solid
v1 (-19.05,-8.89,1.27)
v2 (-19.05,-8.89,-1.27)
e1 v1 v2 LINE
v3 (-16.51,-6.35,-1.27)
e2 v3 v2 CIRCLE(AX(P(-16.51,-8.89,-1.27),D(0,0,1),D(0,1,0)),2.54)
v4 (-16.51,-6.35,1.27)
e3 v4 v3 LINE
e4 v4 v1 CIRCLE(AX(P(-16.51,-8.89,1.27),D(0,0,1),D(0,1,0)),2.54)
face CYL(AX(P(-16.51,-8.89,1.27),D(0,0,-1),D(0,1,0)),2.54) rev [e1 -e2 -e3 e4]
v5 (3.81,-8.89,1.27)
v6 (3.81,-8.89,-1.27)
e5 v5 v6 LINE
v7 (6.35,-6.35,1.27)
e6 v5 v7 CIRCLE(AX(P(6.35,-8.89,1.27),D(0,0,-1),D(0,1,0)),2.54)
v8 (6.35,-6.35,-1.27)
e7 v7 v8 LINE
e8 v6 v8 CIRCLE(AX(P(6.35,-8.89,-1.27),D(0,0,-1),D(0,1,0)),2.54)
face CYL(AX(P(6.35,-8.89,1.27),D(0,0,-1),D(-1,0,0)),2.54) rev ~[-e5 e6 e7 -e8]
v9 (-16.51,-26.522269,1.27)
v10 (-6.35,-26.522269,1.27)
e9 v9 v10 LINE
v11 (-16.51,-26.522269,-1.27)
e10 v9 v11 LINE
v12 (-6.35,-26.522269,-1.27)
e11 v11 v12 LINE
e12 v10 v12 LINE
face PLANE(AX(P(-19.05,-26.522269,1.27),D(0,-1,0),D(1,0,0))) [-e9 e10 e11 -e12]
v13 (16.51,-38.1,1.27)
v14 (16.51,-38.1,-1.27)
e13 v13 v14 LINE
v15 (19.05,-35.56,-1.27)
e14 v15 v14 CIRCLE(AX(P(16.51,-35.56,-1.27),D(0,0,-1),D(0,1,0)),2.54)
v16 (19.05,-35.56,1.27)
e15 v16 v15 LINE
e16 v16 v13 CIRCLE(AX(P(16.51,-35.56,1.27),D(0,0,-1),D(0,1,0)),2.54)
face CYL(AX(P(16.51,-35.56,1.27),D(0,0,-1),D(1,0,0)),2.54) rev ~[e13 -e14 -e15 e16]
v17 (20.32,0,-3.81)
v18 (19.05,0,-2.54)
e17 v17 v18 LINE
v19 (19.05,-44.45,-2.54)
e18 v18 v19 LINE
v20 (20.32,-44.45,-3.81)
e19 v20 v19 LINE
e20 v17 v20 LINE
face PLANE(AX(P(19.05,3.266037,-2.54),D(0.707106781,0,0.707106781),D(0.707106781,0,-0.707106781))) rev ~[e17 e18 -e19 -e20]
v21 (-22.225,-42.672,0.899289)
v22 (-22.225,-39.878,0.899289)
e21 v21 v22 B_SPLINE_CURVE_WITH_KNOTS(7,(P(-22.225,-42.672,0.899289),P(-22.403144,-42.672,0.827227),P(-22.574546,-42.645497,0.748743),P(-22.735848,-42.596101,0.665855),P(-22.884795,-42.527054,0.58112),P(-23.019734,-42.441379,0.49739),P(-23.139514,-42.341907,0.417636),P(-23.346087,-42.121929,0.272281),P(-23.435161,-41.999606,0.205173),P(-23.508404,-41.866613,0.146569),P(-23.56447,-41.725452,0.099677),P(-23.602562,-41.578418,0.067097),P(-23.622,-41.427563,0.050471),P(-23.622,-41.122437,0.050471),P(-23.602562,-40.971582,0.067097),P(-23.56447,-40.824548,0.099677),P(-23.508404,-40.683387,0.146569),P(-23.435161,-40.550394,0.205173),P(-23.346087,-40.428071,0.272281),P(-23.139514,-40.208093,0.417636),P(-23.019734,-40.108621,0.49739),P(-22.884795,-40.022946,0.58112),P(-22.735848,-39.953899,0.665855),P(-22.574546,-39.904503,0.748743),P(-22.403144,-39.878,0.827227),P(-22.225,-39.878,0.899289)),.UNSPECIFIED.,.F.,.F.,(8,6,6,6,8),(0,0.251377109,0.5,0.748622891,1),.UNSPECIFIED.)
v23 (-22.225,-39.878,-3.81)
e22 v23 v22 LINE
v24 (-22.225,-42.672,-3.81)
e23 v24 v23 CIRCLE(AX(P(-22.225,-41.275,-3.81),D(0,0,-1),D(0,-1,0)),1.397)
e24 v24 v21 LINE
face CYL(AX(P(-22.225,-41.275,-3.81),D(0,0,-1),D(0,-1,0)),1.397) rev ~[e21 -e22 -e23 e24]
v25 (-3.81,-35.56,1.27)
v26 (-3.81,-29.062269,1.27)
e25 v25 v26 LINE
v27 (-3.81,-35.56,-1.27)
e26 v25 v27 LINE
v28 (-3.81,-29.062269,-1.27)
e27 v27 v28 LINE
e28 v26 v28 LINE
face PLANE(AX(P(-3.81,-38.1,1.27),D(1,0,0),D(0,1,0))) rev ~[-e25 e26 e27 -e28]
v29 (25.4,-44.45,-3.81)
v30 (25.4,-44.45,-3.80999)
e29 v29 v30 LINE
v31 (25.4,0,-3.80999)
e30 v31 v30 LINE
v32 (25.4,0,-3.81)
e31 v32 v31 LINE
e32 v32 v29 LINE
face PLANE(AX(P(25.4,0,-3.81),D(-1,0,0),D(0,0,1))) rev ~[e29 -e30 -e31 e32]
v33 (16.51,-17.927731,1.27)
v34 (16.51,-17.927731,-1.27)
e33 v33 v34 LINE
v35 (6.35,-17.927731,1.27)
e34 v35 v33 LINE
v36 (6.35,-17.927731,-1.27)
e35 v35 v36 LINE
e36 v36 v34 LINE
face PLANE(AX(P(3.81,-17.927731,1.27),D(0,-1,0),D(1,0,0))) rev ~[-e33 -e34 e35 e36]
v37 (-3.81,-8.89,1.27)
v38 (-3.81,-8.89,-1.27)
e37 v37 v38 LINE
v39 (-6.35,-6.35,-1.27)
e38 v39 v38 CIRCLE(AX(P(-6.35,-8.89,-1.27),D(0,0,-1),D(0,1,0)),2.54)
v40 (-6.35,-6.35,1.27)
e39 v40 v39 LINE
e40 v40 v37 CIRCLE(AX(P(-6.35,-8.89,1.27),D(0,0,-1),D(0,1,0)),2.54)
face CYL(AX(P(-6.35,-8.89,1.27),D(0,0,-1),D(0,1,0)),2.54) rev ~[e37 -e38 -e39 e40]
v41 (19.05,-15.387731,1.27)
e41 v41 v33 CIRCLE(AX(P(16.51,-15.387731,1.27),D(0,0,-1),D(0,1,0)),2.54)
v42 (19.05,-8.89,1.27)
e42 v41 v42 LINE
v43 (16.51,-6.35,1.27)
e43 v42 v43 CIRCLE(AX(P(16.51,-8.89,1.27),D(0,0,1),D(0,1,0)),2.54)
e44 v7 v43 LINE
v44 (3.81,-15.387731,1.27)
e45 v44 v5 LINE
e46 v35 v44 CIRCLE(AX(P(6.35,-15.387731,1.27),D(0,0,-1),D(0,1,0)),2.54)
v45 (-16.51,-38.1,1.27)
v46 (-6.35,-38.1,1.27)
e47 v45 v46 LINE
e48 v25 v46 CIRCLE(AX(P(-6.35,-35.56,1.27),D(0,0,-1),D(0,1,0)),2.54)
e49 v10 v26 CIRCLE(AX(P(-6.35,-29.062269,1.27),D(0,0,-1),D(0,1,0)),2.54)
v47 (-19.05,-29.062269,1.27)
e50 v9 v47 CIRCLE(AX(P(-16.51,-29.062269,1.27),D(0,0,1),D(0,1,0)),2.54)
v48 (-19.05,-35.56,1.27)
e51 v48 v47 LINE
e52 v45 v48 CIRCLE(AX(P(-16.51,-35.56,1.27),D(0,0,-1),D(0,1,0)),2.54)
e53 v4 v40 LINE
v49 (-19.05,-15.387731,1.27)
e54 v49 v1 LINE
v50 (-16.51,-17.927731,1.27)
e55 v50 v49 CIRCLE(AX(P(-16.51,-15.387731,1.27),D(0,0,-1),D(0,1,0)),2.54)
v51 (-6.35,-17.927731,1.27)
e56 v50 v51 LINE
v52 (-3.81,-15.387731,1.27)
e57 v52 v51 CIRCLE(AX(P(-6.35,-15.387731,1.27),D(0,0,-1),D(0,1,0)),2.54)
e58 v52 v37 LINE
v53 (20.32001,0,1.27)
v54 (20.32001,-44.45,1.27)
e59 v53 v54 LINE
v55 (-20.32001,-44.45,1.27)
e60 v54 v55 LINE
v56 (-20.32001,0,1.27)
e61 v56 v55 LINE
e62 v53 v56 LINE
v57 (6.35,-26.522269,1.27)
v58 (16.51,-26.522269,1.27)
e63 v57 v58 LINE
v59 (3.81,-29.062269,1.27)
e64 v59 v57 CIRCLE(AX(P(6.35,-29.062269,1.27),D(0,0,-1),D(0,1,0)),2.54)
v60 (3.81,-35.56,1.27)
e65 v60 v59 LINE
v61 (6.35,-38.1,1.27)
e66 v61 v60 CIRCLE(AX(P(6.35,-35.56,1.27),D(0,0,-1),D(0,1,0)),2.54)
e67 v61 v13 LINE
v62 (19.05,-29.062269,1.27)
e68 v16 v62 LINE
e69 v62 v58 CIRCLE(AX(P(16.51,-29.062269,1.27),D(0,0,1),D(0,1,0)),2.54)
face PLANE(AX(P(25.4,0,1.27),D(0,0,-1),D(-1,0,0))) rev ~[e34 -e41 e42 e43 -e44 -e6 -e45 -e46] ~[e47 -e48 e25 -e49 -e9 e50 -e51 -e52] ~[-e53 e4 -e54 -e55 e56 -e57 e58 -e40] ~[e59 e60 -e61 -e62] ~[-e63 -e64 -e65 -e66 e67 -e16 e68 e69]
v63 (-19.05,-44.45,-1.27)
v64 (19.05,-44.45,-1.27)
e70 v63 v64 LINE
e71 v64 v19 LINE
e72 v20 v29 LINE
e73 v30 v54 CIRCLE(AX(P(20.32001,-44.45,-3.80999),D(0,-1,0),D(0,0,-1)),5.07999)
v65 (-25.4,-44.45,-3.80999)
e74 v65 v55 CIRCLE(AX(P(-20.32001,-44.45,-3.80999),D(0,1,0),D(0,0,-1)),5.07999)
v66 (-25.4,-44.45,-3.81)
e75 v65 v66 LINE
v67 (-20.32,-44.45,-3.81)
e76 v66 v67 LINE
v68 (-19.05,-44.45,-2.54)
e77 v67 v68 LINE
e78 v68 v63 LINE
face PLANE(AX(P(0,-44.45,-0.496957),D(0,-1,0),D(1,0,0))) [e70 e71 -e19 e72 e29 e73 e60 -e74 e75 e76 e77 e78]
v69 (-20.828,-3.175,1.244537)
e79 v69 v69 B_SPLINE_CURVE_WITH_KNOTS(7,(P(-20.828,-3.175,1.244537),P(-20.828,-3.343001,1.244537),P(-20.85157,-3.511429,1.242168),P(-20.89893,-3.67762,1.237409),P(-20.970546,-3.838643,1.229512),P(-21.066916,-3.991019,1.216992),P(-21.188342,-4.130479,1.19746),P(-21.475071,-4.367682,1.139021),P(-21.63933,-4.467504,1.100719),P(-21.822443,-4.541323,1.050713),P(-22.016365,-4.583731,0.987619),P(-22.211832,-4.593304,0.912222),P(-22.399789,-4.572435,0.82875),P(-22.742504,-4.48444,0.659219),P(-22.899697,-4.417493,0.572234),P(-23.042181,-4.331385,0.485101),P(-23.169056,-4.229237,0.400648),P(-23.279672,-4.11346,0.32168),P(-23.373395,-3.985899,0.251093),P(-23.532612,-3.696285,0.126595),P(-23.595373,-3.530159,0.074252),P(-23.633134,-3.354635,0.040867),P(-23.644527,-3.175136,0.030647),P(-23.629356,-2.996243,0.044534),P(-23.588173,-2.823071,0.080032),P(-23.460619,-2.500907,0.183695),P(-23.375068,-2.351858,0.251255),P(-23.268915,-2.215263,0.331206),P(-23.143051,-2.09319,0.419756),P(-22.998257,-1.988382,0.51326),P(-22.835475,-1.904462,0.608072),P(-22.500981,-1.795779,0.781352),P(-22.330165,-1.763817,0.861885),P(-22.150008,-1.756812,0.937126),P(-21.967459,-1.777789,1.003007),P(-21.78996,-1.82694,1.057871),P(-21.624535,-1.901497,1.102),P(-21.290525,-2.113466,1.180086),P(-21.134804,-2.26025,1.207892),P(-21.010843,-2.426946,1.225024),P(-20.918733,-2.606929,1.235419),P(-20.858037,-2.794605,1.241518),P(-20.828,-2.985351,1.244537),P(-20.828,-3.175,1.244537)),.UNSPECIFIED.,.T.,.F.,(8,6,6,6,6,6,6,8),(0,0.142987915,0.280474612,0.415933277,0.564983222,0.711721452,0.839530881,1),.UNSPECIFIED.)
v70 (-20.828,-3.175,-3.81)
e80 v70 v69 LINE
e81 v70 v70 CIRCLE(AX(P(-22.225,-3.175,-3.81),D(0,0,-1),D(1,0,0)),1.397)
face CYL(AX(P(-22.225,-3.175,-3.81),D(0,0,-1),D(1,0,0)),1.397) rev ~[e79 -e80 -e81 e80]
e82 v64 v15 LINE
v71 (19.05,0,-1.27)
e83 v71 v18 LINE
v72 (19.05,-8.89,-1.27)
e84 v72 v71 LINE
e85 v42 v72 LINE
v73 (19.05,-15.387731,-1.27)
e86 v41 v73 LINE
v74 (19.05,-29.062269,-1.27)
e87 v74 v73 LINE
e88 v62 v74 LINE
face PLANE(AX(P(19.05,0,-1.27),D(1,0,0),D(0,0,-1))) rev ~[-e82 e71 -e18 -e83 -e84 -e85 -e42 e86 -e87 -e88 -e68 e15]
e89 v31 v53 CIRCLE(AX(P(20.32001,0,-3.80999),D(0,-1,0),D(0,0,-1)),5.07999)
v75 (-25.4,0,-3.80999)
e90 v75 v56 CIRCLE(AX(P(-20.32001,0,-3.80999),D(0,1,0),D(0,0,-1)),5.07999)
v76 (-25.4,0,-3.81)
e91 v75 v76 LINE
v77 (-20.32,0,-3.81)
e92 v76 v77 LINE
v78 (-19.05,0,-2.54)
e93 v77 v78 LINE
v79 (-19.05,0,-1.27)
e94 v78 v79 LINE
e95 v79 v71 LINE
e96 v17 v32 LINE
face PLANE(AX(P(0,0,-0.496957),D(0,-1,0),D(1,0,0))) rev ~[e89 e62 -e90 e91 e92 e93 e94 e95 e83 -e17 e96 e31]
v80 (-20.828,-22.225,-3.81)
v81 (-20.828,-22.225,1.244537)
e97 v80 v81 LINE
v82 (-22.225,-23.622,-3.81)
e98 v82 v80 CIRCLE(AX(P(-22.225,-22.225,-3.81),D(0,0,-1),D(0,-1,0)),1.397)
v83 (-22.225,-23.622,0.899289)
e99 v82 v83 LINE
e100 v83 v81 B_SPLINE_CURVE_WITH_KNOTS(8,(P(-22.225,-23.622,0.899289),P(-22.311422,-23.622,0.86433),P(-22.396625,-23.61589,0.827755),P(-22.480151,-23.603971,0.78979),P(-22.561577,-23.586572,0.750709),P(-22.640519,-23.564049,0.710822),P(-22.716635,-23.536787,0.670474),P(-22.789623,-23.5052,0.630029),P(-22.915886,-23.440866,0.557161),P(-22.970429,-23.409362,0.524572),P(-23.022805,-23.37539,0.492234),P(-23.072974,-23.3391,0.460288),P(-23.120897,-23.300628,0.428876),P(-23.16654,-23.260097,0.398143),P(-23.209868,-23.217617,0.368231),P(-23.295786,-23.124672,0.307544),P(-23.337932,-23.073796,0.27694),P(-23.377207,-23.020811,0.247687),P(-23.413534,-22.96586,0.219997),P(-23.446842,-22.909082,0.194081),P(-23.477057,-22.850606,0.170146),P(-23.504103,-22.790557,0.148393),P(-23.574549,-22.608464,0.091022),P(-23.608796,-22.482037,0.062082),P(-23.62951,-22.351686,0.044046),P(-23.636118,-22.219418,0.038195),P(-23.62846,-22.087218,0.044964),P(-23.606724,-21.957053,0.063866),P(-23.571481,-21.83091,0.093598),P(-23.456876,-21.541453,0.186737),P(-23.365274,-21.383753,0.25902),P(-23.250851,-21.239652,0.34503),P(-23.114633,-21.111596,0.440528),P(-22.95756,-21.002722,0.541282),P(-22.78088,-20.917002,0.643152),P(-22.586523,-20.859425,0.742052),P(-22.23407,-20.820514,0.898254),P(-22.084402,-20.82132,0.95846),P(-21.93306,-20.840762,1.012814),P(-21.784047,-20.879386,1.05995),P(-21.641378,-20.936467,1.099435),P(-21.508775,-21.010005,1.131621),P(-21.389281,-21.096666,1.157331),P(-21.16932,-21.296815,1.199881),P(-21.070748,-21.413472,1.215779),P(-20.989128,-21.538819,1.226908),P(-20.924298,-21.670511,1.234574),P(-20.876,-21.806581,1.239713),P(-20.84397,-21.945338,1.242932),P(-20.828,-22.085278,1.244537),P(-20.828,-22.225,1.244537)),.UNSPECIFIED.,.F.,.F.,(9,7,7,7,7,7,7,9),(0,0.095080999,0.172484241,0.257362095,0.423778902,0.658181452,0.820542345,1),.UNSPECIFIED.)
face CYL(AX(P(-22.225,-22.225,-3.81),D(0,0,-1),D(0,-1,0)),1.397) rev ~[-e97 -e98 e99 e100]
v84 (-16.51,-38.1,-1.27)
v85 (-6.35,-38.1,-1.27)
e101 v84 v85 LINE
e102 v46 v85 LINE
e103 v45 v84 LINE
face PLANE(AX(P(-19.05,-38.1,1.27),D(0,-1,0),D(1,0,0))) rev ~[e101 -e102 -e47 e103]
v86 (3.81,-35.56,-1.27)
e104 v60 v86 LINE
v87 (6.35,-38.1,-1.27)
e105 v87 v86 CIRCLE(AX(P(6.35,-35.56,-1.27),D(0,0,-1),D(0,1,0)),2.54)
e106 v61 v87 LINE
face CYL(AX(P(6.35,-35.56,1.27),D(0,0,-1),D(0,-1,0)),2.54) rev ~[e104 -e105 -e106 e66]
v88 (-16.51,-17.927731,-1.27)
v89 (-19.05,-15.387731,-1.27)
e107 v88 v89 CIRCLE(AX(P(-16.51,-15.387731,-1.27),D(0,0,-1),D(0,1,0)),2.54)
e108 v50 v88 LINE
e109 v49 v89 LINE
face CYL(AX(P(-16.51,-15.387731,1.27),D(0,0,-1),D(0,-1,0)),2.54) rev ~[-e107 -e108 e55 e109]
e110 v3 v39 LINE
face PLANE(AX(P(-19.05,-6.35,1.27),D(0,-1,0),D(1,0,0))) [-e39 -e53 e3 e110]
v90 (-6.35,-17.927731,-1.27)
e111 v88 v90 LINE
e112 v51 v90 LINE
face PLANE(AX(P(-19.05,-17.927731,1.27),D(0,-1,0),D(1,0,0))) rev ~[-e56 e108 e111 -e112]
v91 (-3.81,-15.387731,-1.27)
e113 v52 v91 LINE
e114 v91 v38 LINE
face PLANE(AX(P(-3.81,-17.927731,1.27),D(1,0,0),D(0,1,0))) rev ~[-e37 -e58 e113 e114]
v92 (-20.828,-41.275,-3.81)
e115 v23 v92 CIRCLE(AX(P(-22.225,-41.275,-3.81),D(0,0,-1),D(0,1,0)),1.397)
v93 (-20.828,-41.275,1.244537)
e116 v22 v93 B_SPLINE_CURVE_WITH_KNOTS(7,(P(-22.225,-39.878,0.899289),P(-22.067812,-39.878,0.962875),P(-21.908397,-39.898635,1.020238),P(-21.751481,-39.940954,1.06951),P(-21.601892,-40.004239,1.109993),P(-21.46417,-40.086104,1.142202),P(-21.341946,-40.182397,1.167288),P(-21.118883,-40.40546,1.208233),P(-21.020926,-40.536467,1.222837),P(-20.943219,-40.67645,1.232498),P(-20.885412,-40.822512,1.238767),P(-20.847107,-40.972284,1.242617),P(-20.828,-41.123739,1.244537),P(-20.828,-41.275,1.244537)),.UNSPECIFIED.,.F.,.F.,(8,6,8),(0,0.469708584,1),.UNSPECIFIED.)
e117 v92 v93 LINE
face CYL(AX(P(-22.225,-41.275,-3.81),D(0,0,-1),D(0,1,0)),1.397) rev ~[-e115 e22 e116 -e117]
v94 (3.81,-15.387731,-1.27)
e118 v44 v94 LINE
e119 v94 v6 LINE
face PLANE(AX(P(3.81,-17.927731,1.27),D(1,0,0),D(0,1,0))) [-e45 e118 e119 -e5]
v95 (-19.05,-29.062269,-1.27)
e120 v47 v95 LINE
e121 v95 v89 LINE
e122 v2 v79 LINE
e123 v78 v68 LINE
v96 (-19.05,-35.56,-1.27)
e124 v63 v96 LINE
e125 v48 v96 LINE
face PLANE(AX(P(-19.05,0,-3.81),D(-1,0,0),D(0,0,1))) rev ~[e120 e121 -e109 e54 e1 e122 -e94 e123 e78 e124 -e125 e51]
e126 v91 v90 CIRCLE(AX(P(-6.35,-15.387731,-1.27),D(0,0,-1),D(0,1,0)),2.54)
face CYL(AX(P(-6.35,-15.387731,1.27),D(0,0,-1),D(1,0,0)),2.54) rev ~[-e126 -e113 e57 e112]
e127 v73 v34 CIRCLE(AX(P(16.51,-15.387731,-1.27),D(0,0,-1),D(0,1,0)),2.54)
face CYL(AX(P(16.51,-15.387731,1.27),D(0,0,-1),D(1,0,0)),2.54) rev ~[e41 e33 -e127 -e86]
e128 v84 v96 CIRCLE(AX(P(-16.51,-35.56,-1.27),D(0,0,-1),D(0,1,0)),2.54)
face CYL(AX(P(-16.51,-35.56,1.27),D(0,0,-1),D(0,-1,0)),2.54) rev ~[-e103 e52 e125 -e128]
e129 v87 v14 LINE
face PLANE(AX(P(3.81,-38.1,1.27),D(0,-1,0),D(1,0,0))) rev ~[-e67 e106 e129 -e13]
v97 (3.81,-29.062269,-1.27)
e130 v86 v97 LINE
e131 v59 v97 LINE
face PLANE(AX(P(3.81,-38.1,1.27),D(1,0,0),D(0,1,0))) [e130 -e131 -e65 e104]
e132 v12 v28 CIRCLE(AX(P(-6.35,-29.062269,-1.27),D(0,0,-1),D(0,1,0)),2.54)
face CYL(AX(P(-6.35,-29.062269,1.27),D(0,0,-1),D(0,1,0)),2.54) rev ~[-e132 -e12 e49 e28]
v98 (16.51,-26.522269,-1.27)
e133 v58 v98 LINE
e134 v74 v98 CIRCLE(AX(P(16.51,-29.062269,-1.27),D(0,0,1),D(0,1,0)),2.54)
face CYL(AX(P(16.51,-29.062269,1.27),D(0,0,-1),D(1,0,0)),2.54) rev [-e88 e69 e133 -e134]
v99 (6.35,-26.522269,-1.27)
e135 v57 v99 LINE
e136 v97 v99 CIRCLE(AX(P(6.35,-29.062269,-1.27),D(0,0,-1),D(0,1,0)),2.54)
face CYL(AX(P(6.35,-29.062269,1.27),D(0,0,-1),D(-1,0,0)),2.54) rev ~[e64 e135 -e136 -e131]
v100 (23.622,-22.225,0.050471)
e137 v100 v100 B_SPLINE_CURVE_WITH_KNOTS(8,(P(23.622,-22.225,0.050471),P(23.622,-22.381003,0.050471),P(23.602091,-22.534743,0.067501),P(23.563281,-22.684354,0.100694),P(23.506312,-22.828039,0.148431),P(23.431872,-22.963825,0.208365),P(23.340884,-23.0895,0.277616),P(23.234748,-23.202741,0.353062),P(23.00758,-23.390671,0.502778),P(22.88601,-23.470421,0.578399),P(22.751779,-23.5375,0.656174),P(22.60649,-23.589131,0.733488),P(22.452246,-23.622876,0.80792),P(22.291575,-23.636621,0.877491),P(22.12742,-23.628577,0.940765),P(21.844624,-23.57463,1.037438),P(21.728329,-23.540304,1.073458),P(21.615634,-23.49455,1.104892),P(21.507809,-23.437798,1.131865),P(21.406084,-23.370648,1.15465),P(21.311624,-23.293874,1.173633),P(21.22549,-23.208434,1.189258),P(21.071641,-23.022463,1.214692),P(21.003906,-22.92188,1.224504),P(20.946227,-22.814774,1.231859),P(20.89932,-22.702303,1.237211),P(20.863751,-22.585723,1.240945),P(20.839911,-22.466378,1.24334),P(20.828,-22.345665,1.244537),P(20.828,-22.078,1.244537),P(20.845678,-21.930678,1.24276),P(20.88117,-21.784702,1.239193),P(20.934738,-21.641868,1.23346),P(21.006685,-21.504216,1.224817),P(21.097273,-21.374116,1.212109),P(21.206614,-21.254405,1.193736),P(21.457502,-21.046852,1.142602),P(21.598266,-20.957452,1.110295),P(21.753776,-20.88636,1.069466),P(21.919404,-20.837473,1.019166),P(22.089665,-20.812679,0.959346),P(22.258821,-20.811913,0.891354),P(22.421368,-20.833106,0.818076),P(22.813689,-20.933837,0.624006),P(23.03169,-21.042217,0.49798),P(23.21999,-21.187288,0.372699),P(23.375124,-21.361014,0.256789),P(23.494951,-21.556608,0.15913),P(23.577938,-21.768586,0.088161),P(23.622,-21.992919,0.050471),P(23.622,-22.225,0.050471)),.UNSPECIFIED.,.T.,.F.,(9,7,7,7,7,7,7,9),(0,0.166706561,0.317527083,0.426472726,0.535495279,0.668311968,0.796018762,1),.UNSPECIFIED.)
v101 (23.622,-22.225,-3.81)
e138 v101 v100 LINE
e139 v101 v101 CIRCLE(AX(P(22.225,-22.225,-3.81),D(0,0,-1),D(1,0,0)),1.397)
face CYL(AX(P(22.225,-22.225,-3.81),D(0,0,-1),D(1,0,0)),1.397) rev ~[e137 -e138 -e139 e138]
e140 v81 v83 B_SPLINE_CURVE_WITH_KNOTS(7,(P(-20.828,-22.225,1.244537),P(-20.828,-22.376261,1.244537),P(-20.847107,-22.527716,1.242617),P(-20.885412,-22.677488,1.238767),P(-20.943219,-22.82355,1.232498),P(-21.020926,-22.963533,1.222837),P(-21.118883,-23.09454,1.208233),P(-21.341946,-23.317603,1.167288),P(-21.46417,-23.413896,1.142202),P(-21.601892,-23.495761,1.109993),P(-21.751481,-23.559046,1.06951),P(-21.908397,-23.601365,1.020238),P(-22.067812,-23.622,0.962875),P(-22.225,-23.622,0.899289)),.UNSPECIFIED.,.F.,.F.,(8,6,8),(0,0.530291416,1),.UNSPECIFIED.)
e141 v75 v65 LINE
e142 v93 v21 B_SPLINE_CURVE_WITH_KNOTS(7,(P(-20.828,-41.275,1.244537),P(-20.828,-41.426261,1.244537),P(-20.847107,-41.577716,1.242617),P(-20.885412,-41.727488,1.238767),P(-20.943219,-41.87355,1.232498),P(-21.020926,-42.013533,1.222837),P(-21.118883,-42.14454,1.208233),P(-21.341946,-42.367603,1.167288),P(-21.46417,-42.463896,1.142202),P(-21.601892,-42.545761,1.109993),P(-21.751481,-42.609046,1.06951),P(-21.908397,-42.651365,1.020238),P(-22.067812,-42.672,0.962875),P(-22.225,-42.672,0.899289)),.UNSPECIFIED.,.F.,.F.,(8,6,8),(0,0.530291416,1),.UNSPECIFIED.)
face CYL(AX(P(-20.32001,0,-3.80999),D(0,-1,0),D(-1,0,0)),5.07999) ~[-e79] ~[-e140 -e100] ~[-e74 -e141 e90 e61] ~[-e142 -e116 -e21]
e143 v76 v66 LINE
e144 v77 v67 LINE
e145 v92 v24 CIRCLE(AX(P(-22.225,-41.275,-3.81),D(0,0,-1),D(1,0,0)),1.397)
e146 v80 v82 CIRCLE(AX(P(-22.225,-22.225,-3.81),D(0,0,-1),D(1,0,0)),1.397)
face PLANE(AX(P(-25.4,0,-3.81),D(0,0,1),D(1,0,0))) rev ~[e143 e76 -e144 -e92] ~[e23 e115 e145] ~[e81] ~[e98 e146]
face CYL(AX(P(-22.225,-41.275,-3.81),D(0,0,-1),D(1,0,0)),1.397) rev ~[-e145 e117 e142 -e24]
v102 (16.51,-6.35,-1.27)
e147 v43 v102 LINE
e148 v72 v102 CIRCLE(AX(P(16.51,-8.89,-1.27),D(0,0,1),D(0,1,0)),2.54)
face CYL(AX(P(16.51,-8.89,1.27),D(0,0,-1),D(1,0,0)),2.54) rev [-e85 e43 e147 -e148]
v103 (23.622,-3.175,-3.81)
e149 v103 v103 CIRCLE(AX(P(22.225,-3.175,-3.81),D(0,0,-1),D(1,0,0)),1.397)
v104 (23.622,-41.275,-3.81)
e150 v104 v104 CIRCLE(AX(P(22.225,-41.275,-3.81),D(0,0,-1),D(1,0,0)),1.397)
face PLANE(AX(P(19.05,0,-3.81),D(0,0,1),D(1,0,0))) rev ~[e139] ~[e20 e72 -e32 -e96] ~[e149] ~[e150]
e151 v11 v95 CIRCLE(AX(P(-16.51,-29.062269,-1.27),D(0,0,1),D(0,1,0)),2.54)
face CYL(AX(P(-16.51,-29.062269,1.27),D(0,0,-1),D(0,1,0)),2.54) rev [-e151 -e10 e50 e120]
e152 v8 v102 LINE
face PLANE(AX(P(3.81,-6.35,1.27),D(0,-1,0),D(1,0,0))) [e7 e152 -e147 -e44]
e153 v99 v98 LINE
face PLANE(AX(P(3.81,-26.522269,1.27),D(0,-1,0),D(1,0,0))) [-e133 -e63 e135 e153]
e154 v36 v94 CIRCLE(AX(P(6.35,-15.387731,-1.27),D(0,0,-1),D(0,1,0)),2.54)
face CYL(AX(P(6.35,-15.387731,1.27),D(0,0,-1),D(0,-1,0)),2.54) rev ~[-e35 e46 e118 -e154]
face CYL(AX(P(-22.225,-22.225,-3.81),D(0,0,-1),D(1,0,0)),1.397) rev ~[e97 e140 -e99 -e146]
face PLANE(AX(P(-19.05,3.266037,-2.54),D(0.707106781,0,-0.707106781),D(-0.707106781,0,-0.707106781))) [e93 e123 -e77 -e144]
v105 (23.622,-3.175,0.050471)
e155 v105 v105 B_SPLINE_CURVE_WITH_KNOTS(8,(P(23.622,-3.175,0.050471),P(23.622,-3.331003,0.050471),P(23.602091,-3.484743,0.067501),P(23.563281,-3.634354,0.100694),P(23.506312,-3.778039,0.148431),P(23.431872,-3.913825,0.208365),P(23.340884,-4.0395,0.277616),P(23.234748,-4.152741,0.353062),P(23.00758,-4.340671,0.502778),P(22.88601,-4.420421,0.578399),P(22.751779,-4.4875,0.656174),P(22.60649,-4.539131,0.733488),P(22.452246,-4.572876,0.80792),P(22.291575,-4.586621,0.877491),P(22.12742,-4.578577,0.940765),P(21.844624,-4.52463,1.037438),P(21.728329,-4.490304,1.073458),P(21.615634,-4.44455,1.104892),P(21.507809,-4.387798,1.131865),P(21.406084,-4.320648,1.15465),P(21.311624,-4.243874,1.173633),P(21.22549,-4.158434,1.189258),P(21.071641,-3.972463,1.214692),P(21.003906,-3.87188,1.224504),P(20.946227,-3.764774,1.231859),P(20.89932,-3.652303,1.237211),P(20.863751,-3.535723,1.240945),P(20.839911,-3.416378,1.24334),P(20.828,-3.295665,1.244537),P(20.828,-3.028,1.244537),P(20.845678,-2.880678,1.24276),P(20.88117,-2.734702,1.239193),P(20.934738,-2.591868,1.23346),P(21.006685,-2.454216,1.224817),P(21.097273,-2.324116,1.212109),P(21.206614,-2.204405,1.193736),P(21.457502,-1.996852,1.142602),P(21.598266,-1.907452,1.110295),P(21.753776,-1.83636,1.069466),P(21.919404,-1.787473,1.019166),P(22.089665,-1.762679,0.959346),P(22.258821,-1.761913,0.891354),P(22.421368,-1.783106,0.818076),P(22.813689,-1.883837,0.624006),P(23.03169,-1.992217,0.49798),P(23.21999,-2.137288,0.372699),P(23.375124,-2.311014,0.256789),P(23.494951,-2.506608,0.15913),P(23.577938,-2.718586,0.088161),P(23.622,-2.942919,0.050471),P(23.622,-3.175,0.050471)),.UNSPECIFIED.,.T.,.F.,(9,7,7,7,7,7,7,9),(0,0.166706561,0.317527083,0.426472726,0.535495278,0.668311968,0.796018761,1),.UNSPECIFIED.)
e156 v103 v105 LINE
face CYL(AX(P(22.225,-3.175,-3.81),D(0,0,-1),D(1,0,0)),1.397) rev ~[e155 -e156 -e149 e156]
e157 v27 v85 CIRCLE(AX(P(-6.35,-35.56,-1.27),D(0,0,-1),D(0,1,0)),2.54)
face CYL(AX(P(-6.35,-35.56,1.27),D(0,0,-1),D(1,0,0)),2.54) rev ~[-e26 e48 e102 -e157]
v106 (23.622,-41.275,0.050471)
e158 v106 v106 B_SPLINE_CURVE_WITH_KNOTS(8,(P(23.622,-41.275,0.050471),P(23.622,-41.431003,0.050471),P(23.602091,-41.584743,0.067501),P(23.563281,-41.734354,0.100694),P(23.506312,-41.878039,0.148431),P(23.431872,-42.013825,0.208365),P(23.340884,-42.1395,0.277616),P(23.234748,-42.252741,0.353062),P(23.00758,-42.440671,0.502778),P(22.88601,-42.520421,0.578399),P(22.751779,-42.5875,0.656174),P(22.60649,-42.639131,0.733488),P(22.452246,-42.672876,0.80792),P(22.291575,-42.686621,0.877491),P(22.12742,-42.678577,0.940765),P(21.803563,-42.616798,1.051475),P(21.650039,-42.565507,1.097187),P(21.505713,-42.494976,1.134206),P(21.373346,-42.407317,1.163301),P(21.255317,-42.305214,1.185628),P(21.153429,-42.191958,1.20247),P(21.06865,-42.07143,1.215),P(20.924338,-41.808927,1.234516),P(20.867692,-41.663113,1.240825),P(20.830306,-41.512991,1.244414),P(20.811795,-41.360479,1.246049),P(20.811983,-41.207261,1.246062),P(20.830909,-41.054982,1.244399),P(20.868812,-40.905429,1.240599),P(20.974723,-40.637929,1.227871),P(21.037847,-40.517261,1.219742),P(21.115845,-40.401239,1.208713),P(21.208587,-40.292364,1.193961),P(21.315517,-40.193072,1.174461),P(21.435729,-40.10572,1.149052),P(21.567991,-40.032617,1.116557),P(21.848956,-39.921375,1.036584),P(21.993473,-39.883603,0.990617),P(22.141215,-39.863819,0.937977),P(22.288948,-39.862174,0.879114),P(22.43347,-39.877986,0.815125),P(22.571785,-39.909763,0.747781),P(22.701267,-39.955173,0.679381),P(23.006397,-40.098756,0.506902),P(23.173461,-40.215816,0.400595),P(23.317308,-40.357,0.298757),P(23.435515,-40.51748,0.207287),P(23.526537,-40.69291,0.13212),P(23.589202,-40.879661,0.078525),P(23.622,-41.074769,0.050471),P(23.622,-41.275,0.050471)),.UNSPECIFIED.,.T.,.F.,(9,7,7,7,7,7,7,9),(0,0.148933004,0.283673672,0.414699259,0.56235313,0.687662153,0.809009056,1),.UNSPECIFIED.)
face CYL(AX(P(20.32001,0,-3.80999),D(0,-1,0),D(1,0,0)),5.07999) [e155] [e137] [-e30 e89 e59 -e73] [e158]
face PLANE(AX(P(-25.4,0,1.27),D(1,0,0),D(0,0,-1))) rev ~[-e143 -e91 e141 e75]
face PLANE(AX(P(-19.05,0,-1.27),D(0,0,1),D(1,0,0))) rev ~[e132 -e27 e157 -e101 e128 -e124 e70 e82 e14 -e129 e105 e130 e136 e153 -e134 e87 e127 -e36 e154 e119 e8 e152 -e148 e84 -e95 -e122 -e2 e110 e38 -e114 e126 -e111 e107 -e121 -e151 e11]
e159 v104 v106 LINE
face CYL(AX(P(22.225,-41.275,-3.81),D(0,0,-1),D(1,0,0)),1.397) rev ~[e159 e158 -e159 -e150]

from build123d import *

# Parameters (mm, degrees)
F1_DEPTH    = 44.45
F2_R        = 5.07999
F3_R        = 1.397
F4_DEPTH    = 25.4
F5_W        = 15.24
F5_H        = 11.5777312835
F6_DEPTH    = 25.4
F7_R        = 2.54
F8_T1_DEPTH = 50.9820747894


# Not quite as in the source:
# - a fillet or chamfer that OpenCascade refuses, or shapes differently, is made with other operations: its cross-section is extruded or revolved along the edge and cut away or added
# - a fillet or chamfer is up to 0.001 mm smaller than in the source, because OpenCascade refuses the exact size


with BuildPart() as f1:
    # F0 (on Front) → F1 (new body)
    with BuildSketch(Plane.XZ):
        Polygon((0, 1.27), (-25.4, 1.27), (-25.4, -1.27), (-25.4, -3.81), (-19.05, -3.81), (-19.05, -1.27), (19.05, -1.27), (19.05, -3.81), (25.4, -3.81), (25.4, -1.27), (25.4, 1.27), align=None)
    extrude(amount=F1_DEPTH)

    # F2 (radius 5.08 in the source; OpenCascade refuses exactly that, so slightly less here)
    f2_edges = [f1.edges().sort_by_distance(p)[0] for p in [
        (-25.4, -22.225, 1.27),
        (25.4, -22.225, 1.27),
    ]]
    fillet(f2_edges, radius=F2_R)

    # F3 (on face) → F4 (cut)
    with BuildSketch(Plane(origin=(0, 0, -3.81), x_dir=(1, 0, 0), z_dir=(0, 0, -1))):
        with BuildLine():
            ThreePointArc((-22.225, 23.622), (-23.2128281733, 21.2371718267), (-20.828, 22.225))
            Line((-20.828, 22.225), (-22.225, 22.225))
            Line((-22.225, 22.225), (-22.225, 23.622))
        make_face()
        with BuildLine():
            Line((-22.225, 22.225), (-20.828, 22.225))
            ThreePointArc((-20.828, 22.225), (-21.2371718267, 23.2128281733), (-22.225, 23.622))
            Line((-22.225, 23.622), (-22.225, 22.225))
        make_face()
        with BuildLine():
            ThreePointArc((-22.225, 42.672), (-23.622, 41.275), (-22.225, 39.878))
            Line((-22.225, 39.878), (-22.225, 41.275))
            Line((-22.225, 41.275), (-22.225, 42.672))
        make_face()
        with BuildLine():
            Line((-22.225, 41.275), (-22.225, 39.878))
            ThreePointArc((-22.225, 39.878), (-21.2371718267, 40.2871718267), (-20.828, 41.275))
            ThreePointArc((-20.828, 41.275), (-21.2371718267, 42.2628281733), (-22.225, 42.672))
            Line((-22.225, 42.672), (-22.225, 41.275))
        make_face()
        with Locations((-22.225, 3.175)):
            Circle(F3_R)
        with Locations((22.225, 41.275)):
            Circle(F3_R)
        with Locations((22.225, 3.175)):
            Circle(F3_R)
        with Locations((22.225, 22.225)):
            Circle(F3_R)
    extrude(amount=-F4_DEPTH, mode=Mode.SUBTRACT)

    # F5 (on face) → F6 (cut)
    with BuildSketch(Plane.XY.offset(1.27)):
        with Locations((11.43, -12.1388656418)):
            Rectangle(F5_W, F5_H)
        with Locations((-11.43, -12.1388656418)):
            Rectangle(F5_W, F5_H)
        with Locations((11.43, -32.3111343582)):
            Rectangle(F5_W, F5_H)
        with Locations((-11.43, -32.3111343582)):
            Rectangle(F5_W, F5_H)
    extrude(amount=-F6_DEPTH, mode=Mode.SUBTRACT)

    # F7
    f7_edges = [f1.edges().sort_by_distance(p)[0] for p in [
        (-19.05, -6.35, 0),
        (-3.81, -17.927731, 0),
        (-3.81, -6.35, 0),
        (-19.05, -17.927731, 0),
        (-19.05, -38.1, 0),
        (3.81, -38.1, 0),
        (3.81, -17.927731, 0),
        (3.81, -6.35, 0),
        (-19.05, -26.522269, 0),
        (3.81, -26.522269, 0),
        (19.05, -26.522269, 0),
        (-3.81, -26.522269, 0),
        (19.05, -6.35, 0),
        (19.05, -17.927731, 0),
        (19.05, -38.1, 0),
        (-3.81, -38.1, 0),
    ]]
    fillet(f7_edges, radius=F7_R)

    # F8: chamfer of 1.27 on 14 edges, made by hand

    # F8_s2 → F8_t1 (cut)
    with BuildSketch(Plane.XZ.offset(-3.2660373947)):
        Polygon((19.05, -2.54), (20.32, -3.81), (19.05, -3.81), align=None)
        Polygon((-19.05, -2.54), (-20.32, -3.81), (-19.05, -3.81), align=None)
    extrude(amount=F8_T1_DEPTH, mode=Mode.SUBTRACT)


solid = f1.part
